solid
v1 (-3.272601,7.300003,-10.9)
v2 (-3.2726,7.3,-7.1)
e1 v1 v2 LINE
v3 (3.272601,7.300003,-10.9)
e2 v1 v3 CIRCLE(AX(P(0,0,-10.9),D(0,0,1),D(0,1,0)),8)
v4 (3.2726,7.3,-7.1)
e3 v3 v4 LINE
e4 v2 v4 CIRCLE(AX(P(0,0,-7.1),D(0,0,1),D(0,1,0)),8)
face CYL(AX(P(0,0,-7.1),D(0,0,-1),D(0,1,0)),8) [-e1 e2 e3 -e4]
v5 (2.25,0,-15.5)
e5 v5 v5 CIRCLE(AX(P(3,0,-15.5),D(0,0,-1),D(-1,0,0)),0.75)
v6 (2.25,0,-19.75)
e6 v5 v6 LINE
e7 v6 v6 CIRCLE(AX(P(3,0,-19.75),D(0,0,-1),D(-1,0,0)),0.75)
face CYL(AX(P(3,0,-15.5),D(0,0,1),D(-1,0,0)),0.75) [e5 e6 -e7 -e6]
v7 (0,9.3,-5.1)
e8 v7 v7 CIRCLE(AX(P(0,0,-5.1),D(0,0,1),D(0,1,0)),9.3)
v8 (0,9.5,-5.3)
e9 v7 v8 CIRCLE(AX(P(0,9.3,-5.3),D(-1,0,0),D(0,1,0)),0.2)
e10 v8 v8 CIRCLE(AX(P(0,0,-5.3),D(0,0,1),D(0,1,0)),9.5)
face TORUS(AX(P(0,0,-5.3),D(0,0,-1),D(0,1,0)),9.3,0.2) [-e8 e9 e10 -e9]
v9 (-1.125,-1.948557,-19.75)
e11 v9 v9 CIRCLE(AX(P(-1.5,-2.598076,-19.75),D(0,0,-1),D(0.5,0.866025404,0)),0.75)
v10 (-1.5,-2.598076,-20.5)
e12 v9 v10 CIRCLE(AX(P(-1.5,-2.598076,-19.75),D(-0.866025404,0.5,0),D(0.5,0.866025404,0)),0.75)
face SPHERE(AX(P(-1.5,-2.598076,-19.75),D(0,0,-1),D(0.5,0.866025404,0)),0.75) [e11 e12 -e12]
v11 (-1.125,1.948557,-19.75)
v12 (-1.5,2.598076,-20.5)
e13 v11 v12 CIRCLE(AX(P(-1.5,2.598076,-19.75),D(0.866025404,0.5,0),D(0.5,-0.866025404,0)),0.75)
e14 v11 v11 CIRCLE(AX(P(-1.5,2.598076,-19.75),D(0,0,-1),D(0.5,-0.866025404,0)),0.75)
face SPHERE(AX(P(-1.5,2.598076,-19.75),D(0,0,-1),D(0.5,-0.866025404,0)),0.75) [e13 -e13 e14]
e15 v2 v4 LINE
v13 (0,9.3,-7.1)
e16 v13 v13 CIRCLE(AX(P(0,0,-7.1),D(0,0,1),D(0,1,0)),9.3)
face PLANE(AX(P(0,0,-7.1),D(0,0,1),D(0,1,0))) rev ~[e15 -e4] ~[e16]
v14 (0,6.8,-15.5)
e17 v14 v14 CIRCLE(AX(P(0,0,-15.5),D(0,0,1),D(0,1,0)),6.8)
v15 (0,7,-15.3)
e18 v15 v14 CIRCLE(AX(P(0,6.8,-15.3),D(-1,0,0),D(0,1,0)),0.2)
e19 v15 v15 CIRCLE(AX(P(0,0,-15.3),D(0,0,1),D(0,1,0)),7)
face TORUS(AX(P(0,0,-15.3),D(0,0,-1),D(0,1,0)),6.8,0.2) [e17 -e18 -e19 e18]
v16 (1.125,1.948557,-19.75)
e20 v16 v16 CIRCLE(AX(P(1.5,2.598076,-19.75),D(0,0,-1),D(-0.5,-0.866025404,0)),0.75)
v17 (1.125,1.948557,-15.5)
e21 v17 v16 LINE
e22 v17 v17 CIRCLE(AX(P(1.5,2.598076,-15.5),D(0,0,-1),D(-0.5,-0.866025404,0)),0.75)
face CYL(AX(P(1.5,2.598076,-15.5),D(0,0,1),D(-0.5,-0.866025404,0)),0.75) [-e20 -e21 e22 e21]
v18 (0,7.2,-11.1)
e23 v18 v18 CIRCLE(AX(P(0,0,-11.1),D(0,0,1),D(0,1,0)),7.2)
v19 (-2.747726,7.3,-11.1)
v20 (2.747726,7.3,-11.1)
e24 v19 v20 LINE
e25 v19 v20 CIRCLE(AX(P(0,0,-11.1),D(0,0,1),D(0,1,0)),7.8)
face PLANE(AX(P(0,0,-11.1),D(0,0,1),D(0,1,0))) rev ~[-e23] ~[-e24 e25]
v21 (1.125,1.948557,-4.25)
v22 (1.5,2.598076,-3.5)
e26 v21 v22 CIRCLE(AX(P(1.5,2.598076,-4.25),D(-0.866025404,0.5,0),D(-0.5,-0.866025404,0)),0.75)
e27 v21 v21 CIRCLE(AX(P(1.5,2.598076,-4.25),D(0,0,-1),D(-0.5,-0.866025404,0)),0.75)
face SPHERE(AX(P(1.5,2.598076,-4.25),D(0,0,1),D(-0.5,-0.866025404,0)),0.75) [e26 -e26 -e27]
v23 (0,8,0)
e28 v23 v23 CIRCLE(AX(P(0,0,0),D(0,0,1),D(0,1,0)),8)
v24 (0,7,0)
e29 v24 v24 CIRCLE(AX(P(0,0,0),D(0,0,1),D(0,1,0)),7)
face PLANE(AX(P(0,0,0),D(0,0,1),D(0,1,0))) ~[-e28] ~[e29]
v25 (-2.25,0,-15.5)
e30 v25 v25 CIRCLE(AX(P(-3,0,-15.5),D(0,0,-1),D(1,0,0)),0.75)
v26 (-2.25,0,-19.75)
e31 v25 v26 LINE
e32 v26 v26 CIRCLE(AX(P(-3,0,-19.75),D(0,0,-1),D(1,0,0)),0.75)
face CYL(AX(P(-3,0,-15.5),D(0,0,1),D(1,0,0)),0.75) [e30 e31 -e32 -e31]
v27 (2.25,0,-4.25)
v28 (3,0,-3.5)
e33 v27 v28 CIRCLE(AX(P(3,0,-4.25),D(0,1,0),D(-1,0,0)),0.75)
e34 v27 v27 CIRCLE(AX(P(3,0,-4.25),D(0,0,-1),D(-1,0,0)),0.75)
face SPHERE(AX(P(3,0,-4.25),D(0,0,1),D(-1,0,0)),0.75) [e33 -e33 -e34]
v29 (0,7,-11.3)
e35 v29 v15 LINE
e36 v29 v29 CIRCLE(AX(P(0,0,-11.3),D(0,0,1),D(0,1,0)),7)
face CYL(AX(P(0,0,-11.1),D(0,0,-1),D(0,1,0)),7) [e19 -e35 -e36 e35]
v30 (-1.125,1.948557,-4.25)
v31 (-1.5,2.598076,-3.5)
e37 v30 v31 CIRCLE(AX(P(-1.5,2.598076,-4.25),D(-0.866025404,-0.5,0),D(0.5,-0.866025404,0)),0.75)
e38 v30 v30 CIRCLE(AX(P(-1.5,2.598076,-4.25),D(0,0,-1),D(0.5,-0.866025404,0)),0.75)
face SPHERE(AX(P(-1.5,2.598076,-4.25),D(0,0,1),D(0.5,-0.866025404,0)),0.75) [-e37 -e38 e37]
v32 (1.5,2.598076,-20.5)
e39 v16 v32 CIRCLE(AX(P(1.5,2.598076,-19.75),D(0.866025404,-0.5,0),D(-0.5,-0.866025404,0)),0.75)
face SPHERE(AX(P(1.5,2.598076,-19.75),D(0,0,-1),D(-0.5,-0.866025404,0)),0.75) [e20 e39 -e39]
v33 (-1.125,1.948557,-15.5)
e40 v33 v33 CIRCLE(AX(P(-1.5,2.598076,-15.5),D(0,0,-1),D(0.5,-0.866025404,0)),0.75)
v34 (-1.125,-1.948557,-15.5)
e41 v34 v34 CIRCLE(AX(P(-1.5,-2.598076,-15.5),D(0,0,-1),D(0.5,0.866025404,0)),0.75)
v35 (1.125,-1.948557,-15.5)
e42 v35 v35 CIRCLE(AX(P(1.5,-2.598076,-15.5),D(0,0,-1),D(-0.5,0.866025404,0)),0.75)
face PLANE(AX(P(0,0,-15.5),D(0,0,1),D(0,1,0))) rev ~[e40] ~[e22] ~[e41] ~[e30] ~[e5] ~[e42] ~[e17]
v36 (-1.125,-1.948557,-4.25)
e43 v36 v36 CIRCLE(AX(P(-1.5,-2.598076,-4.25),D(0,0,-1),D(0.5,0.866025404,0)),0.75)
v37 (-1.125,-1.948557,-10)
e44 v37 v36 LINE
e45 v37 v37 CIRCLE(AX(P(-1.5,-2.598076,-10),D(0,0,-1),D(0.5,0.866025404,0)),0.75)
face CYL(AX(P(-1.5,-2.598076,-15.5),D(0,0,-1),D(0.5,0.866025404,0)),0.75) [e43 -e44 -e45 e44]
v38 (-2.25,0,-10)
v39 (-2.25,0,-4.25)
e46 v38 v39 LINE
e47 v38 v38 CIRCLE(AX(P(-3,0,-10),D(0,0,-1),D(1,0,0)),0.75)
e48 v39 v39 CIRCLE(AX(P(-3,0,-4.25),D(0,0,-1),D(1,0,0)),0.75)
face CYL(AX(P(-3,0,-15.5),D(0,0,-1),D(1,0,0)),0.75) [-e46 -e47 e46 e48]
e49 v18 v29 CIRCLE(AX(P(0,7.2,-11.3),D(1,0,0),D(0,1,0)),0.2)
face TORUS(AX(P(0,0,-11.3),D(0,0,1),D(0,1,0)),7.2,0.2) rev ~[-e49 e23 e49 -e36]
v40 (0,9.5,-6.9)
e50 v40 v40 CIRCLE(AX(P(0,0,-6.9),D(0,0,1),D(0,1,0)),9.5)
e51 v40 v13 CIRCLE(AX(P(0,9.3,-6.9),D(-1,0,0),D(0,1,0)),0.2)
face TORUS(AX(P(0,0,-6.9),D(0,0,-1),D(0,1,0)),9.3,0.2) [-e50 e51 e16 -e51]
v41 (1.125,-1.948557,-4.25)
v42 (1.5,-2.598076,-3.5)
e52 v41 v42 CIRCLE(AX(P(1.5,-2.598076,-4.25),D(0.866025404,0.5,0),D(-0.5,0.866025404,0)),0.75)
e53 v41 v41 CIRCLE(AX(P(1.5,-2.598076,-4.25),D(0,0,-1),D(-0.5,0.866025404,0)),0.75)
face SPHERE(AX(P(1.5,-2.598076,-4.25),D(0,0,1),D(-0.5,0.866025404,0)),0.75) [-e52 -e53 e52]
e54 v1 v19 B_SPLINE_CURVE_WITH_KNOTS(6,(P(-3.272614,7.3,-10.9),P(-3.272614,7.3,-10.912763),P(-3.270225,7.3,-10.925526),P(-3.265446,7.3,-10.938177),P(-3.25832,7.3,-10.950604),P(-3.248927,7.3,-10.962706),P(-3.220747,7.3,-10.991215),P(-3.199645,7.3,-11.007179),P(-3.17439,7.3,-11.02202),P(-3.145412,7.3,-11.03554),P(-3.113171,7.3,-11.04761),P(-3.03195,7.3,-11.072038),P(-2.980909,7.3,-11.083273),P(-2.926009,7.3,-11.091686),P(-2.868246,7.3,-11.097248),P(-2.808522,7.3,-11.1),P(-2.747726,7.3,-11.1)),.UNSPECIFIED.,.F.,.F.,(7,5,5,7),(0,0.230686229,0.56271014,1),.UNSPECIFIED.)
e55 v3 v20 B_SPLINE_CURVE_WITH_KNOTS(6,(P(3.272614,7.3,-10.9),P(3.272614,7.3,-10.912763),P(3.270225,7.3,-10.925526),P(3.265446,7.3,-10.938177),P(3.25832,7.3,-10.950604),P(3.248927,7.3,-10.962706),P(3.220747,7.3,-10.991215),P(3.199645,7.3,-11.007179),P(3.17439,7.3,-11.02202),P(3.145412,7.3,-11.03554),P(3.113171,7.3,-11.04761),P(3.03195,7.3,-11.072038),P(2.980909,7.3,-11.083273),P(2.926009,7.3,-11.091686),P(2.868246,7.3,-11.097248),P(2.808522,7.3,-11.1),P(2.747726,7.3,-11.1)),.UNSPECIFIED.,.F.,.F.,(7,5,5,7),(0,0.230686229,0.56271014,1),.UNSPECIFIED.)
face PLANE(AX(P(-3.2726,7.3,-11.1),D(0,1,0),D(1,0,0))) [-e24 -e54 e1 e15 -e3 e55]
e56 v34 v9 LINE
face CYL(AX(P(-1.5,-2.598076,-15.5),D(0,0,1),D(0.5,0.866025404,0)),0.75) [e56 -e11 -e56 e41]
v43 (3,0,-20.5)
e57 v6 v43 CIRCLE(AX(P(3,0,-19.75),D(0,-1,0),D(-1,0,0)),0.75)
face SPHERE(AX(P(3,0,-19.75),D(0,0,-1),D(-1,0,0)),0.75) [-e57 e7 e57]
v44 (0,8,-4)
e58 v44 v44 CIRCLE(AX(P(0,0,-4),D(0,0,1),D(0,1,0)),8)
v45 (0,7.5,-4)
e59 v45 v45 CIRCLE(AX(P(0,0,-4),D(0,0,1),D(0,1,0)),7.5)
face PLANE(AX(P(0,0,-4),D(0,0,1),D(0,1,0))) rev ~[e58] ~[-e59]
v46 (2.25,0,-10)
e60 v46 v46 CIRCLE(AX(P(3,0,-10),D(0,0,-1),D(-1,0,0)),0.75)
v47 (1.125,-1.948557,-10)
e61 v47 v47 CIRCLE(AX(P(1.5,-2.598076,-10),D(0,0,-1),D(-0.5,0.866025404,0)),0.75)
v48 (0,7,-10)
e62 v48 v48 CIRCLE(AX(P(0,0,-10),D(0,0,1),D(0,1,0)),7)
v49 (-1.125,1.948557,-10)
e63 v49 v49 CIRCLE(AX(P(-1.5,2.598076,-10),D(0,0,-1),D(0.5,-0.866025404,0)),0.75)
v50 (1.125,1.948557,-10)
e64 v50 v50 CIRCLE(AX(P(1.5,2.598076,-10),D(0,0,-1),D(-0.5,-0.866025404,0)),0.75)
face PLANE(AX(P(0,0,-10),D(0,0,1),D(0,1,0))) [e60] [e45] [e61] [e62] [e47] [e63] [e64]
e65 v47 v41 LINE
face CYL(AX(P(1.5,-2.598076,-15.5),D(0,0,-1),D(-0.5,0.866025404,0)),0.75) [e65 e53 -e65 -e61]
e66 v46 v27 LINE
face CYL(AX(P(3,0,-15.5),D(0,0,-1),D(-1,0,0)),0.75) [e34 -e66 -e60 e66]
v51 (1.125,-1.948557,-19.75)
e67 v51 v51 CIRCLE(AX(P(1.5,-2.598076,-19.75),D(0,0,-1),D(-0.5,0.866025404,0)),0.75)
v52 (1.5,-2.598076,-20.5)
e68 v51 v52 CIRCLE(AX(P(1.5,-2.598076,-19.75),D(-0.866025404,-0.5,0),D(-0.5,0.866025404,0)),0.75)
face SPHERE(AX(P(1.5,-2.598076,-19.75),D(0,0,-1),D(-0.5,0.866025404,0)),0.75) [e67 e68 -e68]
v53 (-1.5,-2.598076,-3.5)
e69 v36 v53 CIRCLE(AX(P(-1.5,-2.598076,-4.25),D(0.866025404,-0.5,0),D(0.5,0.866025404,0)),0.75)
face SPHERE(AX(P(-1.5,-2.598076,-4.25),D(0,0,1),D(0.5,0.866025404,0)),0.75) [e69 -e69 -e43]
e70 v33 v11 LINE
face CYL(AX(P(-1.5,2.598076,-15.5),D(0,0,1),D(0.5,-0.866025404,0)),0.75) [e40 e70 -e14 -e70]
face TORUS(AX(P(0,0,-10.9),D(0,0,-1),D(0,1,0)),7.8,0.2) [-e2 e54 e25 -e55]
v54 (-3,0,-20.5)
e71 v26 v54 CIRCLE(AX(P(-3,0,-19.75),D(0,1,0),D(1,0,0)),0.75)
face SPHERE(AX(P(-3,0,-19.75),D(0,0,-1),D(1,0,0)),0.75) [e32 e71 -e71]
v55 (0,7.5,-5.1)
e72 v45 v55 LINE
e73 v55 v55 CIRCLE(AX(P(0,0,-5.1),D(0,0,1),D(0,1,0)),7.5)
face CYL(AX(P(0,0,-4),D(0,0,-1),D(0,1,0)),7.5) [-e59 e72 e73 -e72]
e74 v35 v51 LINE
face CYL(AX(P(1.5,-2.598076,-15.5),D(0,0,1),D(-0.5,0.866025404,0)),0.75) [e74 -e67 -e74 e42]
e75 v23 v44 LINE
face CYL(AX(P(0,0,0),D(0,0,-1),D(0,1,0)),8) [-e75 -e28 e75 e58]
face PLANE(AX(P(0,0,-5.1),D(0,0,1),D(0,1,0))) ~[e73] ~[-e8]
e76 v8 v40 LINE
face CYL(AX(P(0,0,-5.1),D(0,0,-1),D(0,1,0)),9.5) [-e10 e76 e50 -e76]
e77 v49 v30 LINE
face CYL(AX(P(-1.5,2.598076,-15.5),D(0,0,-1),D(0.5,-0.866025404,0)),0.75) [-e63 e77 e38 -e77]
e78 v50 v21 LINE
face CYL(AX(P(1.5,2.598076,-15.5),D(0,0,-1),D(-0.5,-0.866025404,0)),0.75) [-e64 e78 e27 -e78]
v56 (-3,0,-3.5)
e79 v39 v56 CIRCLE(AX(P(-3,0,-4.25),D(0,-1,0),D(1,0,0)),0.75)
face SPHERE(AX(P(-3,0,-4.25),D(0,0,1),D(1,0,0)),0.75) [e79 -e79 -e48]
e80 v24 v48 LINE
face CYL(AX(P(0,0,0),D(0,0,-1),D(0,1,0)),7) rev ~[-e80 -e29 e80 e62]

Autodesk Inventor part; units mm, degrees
ref_plane "YZ Plane" through (0, 0, 0) normal (1, 0, 0) x (0, 1, 0)
ref_plane "XZ Plane" through (0, 0, 0) normal (0, 1, 0) x (-1, 0, 0)
ref_plane "XY Plane" through (0, 0, 0) normal (0, 0, 1) x (1, 0, 0)
sketch "スケッチ1" plane through (0, 0, 0) normal (1, 0, 0) x (0, 1, 0)
  line L0 (0, 0) -> (8, 0)
  line L1 (8, 0) -> (8, -4)
  line L2 (8, -4) -> (7.5, -4)
  line L3 (7.5, -4) -> (7.5, -5.1)
  line L4 (7.5, -5.1) -> (9.5, -5.1)
  line L5 (9.5, -5.1) -> (9.5, -7.1)
  line L6 (9.5, -7.1) -> (8, -7.1)
  line L7 (7, -15.5) -> (0, -15.5)
  line L8 (0, -15.5) -> (0, 0)
  line L9 (7, 0) -> (7, -10)
  line L10 (7, -10) -> (0, -10)
  line L11 (8, -7.1) -> (8, -11.1)
  line L12 (8, -11.1) -> (7, -11.1)
  line L13 (7, -11.1) -> (7, -15.5)
  dimension "d0" = 8
  dimension "d1" = 9.5
  dimension "d3" = 5.1
  dimension "d4" = 2
  dimension "d5" = 15.5
  dimension "d6" = 0.5
  dimension "d7" = 4
  dimension "d8" = 7
  dimension "d9" = 10
  dimension "d13" = 4
  dimension "d14" = 8
  dimension "d15" = 1
revolve "回転1" add sketch "スケッチ1" angle 360 about axis through (0, 0, -15.5) along (0, 0, 1) contours L0 L1 L2 L3 L4 L5 L6 L11 L12 L13 L7 L8 L10 L9
thread "ねじ1" size "M16x2" class "6g" standard "ANSI Metric M Profile" length 12
thread "ねじ2" size "M16x2" class "6g" standard "ANSI Metric M Profile" length 12
fillet "フィレット1" radius 0.2 5 edges at (0, -9.5, -5.1) (0, -9.5, -7.1) (0, -7, -15.5) (0, -7, -11.1) (0, -8, -11.1)
sketch "スケッチ2" plane through (0, 0, -11.1) normal (0, 0, -1) x (-1, 0, 0)
  circle A0 centre (0, 0) radius 8 projected
  line L0 (3.2726, 7.3) -> (-3.2726, 7.3)
  dimension "d19" = 7.3
extrude "押し出し1" cut sketch "スケッチ2" against normal up to surface (4 mm away) contours L0 A0 picked at (0, 7.5333)
sketch "スケッチ3" plane through (0, 0, -15.5) normal (0, 0, -1) x (-1, 0, 0)
  circle A0 centre (-3, 0) radius 0.75
  point P0 (0, 0)
  dimension "d22" = 1.5
  dimension "d24" = 3
extrude "押し出し2" add sketch "スケッチ3" along normal blind 5 and the other way blind 12
fillet "フィレット2" radius 0.75 2 edges at (3.75, 0, -3.5) (3.75, 0, -20.5)
pattern_circular "円形状パターン1" count 6 over 360 about axis through (0, 0, -10) along (0, 0, 1) of "押し出し2", "フィレット2"
properties part number "PLT-166-R-R" material "アルミニウム 6061"
